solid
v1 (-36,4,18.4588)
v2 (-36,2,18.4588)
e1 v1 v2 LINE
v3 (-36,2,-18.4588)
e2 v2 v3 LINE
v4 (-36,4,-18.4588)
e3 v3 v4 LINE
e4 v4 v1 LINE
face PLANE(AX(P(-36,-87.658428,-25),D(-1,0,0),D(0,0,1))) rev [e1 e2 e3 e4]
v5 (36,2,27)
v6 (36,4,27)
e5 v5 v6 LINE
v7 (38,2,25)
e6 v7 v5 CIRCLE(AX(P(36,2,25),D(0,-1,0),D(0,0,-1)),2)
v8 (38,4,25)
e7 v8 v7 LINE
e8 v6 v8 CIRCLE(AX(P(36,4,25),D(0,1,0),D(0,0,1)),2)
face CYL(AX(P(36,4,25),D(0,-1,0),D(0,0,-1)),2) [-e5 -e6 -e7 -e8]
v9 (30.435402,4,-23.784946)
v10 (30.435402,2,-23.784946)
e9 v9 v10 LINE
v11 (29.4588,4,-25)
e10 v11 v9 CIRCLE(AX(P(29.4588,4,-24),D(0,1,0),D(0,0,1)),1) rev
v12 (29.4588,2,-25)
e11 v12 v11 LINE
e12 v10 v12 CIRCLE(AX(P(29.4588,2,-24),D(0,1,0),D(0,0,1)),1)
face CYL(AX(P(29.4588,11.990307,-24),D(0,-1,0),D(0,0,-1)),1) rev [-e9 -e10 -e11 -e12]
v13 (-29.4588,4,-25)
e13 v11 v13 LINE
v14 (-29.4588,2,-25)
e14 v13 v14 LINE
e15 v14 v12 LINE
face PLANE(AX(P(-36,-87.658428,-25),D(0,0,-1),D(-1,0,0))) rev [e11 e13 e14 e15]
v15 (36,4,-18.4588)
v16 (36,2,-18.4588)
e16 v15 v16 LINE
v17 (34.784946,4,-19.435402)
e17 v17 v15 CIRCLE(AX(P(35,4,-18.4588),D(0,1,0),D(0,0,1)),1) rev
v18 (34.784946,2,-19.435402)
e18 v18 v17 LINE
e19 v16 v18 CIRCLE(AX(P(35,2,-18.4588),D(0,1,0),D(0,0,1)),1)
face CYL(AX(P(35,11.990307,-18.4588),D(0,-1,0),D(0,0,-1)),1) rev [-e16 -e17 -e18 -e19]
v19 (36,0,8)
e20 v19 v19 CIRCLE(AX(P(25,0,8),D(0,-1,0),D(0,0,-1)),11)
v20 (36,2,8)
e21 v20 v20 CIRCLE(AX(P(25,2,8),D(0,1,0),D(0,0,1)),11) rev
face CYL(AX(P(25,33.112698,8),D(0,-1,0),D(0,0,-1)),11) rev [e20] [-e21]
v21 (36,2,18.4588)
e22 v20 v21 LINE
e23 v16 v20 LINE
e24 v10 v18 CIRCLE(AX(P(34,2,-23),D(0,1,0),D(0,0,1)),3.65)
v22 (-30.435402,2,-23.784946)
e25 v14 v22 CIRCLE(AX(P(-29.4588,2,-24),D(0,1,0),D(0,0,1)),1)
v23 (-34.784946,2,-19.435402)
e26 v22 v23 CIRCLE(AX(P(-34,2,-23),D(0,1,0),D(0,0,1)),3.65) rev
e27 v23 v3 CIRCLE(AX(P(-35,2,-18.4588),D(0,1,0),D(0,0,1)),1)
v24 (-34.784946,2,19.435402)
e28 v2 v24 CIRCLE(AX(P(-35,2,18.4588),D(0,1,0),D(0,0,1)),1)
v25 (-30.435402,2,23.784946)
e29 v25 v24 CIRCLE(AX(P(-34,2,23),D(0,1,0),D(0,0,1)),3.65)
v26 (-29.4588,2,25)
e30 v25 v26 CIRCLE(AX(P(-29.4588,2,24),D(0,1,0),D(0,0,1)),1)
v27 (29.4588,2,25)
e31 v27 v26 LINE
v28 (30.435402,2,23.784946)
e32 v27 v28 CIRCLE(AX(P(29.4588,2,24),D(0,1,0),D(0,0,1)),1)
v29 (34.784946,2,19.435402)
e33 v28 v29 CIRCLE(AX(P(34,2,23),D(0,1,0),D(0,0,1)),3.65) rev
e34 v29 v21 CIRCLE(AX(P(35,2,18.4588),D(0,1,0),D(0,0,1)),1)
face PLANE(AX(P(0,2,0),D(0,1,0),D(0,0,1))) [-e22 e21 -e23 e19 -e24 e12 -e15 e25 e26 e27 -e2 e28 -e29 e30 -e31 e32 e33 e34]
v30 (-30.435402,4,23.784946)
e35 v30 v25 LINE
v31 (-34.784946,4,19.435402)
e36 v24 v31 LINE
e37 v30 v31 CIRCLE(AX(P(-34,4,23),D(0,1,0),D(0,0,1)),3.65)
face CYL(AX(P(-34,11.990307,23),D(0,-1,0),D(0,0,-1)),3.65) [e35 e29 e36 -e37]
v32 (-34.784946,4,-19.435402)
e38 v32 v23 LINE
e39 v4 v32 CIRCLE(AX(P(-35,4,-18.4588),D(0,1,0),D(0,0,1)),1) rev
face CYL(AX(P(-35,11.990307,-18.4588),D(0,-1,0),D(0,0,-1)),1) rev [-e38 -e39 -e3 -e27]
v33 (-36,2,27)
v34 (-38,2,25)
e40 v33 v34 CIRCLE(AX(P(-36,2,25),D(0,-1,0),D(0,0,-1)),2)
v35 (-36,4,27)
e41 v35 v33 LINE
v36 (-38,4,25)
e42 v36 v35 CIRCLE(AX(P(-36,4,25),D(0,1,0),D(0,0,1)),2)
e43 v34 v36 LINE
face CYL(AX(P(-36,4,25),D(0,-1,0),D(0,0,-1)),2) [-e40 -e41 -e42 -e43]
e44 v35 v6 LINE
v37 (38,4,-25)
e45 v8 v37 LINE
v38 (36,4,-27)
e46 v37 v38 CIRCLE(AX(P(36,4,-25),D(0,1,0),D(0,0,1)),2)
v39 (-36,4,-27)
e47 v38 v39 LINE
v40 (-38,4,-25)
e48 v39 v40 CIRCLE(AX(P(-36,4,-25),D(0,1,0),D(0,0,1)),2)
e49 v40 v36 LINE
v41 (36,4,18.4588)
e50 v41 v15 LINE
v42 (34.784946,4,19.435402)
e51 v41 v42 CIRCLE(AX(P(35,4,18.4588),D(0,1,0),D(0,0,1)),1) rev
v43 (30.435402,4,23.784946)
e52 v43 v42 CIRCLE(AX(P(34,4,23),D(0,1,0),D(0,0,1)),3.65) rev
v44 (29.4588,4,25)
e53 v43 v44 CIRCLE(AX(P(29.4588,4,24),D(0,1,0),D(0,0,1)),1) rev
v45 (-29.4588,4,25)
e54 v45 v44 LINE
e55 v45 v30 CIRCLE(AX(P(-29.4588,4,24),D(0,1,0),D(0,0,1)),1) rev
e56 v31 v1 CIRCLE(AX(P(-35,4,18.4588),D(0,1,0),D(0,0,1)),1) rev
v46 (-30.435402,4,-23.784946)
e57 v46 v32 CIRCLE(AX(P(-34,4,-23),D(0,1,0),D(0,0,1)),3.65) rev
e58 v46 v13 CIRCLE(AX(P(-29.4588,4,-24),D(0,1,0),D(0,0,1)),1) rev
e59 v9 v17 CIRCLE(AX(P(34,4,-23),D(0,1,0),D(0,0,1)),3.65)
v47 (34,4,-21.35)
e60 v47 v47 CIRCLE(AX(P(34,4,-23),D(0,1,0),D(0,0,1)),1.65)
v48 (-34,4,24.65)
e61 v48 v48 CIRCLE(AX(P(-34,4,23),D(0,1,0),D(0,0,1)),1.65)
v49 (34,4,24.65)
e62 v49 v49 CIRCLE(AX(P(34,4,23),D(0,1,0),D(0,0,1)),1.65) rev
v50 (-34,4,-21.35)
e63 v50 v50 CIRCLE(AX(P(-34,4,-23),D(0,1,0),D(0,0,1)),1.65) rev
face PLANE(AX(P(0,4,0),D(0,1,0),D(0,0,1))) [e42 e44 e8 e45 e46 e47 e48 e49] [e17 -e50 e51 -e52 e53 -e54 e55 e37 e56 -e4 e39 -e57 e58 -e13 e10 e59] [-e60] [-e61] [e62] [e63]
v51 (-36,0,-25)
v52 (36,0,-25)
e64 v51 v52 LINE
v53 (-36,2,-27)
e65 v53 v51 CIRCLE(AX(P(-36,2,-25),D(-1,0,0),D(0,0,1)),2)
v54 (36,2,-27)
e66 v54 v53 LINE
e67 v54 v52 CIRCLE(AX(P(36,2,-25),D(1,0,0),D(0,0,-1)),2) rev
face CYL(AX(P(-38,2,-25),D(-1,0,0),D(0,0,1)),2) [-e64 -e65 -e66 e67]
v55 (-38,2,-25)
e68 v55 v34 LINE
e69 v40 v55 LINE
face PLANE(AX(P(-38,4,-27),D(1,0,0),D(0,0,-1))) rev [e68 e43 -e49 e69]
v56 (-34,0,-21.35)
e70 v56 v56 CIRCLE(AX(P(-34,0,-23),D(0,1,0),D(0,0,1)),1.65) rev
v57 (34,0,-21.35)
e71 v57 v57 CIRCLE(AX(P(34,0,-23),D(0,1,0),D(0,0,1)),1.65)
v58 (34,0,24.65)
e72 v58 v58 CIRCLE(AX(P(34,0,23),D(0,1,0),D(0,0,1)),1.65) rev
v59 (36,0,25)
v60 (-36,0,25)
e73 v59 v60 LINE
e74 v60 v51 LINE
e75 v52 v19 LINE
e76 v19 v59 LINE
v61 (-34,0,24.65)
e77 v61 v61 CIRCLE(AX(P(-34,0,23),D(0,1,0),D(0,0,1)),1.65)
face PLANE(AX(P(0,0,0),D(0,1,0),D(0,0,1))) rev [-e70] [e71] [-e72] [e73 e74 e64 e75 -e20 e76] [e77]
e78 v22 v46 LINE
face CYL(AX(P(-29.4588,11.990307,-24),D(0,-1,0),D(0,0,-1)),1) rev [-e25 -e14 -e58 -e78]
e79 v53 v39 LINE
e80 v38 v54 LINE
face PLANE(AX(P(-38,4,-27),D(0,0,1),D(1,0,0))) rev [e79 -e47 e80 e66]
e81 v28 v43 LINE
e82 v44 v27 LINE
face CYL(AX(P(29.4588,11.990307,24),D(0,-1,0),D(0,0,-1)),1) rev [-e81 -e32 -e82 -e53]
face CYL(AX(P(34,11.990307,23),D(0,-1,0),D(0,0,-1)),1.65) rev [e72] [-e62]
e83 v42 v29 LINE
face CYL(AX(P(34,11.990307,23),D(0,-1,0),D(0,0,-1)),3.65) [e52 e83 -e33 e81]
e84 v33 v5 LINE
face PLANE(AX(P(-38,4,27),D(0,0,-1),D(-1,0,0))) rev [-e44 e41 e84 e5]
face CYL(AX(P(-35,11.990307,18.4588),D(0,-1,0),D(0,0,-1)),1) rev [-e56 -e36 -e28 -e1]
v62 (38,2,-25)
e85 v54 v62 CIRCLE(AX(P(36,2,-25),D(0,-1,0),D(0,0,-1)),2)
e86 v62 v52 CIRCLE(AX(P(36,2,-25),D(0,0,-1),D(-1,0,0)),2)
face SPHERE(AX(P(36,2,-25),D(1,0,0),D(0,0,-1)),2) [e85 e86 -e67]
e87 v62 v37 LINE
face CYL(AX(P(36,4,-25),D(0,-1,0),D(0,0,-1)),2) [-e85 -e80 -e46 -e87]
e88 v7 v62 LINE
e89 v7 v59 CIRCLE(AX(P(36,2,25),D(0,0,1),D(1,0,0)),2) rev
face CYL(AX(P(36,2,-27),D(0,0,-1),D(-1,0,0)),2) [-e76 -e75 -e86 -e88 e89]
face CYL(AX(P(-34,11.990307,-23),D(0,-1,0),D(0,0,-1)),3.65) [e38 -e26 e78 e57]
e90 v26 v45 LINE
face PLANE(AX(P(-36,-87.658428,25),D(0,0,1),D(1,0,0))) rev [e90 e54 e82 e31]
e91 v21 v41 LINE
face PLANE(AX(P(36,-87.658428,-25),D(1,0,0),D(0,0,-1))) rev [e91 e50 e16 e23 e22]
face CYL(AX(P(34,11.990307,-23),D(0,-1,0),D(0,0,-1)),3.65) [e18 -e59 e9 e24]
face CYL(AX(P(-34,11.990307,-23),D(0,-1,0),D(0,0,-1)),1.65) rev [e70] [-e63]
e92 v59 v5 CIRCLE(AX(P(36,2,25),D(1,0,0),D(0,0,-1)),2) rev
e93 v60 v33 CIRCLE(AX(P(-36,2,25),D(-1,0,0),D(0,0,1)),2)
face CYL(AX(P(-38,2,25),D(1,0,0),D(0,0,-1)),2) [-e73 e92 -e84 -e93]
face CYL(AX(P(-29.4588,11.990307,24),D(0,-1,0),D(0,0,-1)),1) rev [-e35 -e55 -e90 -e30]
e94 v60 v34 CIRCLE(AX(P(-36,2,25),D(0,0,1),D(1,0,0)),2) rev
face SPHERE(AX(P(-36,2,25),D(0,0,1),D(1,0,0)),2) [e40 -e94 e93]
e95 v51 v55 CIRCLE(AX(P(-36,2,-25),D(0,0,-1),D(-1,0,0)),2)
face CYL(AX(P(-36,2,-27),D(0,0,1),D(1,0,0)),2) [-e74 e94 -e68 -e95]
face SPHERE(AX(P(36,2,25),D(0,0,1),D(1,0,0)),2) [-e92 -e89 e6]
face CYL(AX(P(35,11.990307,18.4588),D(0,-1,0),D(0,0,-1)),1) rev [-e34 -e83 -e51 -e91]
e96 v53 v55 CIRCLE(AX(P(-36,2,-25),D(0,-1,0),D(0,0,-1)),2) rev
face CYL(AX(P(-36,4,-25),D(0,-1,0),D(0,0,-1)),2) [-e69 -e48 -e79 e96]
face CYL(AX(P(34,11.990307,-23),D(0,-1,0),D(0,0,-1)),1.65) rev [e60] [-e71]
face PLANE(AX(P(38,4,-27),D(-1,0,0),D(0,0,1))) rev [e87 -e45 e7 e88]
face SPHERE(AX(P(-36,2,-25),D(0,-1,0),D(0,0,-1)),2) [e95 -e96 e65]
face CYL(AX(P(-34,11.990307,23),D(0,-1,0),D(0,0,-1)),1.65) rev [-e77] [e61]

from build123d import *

# Parameters (mm, degrees)
SCHIZZO1_W                   = 76
SCHIZZO1_H                   = 54
ESTRUSIONE_ESTRUSIONE1_DEPTH = 4
SCHIZZO2_W                   = 72
SCHIZZO2_H                   = 50
TAGLIO_ESTRUSIONE1_DEPTH     = 2
SCHIZZO3_R                   = 3.65
SCHIZZO3_R_2                 = 1.65
ESTRUSIONE_ESTRUSIONE2_DEPTH = 2
SCHIZZO3_11_R                = 1.65
TAGLIO_ESTRUSIONE4_DEPTH     = 47.658332589
SCHIZZO5_R                   = 11
TAGLIO_ESTRUSIONE5_DEPTH     = 2
RACCORDO1_R                  = 2
RACCORDO2_R                  = 1


with BuildPart() as part:
    # Schizzo1 → Estrusione-Estrusione1 (new body)
    with BuildSketch(Plane(origin=(0, 0, 0), x_dir=(1, 0, 0), z_dir=(0, 1, 0))):
        Rectangle(SCHIZZO1_W, SCHIZZO1_H)
    extrude(amount=ESTRUSIONE_ESTRUSIONE1_DEPTH)

    # Schizzo2 → Taglio-Estrusione1 (cut)
    with BuildSketch(Plane(origin=(0, 4, 0), x_dir=(1, 0, 0), z_dir=(0, 1, 0))):
        Rectangle(SCHIZZO2_W, SCHIZZO2_H)
    extrude(amount=-TAGLIO_ESTRUSIONE1_DEPTH, mode=Mode.SUBTRACT)

    # Schizzo3 → Estrusione-Estrusione2 (add)
    # profile 1 of 4: a face of its own
    with BuildSketch(Plane(origin=(0, 2, 0), x_dir=(1, 0, 0), z_dir=(0, 1, 0))):
        with Locations((34, 23)):
            Circle(SCHIZZO3_R)
        with Locations(Location((34, 23, 0), (0, 0, 270))):
            Circle(SCHIZZO3_R_2, mode=Mode.SUBTRACT)
    # profile 2 of 4: a face of its own
    with BuildSketch(Plane(origin=(0, 2, 0), x_dir=(1, 0, 0), z_dir=(0, 1, 0))):
        with Locations((-34, 23)):
            Circle(SCHIZZO3_R)
        with Locations(Location((-34, 23, 0), (0, 0, 270))):
            Circle(SCHIZZO3_R_2, mode=Mode.SUBTRACT)
    # profile 3 of 4: a face of its own
    with BuildSketch(Plane(origin=(0, 2, 0), x_dir=(1, 0, 0), z_dir=(0, 1, 0))):
        with Locations((34, -23)):
            Circle(SCHIZZO3_R)
        with Locations(Location((34, -23, 0), (0, 0, 270))):
            Circle(SCHIZZO3_R_2, mode=Mode.SUBTRACT)
    # profile 4 of 4: a face of its own
    with BuildSketch(Plane(origin=(0, 2, 0), x_dir=(1, 0, 0), z_dir=(0, 1, 0))):
        with Locations((-34, -23)):
            Circle(SCHIZZO3_R)
        with Locations(Location((-34, -23, 0), (0, 0, 270))):
            Circle(SCHIZZO3_R_2, mode=Mode.SUBTRACT)
    extrude(amount=ESTRUSIONE_ESTRUSIONE2_DEPTH)

    # Schizzo3<11> → Taglio-Estrusione4 (cut, through all)
    with BuildSketch(Plane(origin=(0, 2, 0), x_dir=(1, 0, 0), z_dir=(0, 1, 0))):
        with Locations(Location((-34, 23, 0), (0, 0, 270))):
            Circle(SCHIZZO3_11_R)
        with Locations(Location((-34, -23, 0), (0, 0, 270))):
            Circle(SCHIZZO3_11_R)
        with Locations(Location((34, -23, 0), (0, 0, 270))):
            Circle(SCHIZZO3_11_R)
        with Locations(Location((34, 23, 0), (0, 0, 270))):
            Circle(SCHIZZO3_11_R)
    extrude(amount=-TAGLIO_ESTRUSIONE4_DEPTH, mode=Mode.SUBTRACT)

    # Schizzo5 → Taglio-Estrusione5 (cut)
    with BuildSketch(Plane.XZ):
        with Locations(Location((25, 8, 0), (0, 0, 270))):
            Circle(SCHIZZO5_R)
    extrude(amount=-TAGLIO_ESTRUSIONE5_DEPTH, mode=Mode.SUBTRACT)

    # Raccordo1
    raccordo1_edges = [part.edges().sort_by_distance(p)[0] for p in [
        (0, 0, 27),
        (-38, 0, 0),
        (0, 0, -27),
        (38, 0, 0),
        (38, 2, 27),
        (-38, 2, 27),
        (-38, 2, -27),
        (38, 2, -27),
    ]]
    fillet(raccordo1_edges, radius=RACCORDO1_R - 0.0001)  # a hair under: the kernel refuses the full size

    # Raccordo2
    raccordo2_edges = [part.edges().sort_by_distance(p)[0] for p in [
        (30.946723072, 3, -25),
        (36, 3, -19.946723072),
        (-36, 3, -19.946723072),
        (-30.946723072, 3, -25),
        (-30.946723072, 3, 25),
        (-36, 3, 19.946723072),
        (36, 3, 19.946723072),
        (30.946723072, 3, 25),
    ]]
    fillet(raccordo2_edges, radius=RACCORDO2_R)


solid = part.part
